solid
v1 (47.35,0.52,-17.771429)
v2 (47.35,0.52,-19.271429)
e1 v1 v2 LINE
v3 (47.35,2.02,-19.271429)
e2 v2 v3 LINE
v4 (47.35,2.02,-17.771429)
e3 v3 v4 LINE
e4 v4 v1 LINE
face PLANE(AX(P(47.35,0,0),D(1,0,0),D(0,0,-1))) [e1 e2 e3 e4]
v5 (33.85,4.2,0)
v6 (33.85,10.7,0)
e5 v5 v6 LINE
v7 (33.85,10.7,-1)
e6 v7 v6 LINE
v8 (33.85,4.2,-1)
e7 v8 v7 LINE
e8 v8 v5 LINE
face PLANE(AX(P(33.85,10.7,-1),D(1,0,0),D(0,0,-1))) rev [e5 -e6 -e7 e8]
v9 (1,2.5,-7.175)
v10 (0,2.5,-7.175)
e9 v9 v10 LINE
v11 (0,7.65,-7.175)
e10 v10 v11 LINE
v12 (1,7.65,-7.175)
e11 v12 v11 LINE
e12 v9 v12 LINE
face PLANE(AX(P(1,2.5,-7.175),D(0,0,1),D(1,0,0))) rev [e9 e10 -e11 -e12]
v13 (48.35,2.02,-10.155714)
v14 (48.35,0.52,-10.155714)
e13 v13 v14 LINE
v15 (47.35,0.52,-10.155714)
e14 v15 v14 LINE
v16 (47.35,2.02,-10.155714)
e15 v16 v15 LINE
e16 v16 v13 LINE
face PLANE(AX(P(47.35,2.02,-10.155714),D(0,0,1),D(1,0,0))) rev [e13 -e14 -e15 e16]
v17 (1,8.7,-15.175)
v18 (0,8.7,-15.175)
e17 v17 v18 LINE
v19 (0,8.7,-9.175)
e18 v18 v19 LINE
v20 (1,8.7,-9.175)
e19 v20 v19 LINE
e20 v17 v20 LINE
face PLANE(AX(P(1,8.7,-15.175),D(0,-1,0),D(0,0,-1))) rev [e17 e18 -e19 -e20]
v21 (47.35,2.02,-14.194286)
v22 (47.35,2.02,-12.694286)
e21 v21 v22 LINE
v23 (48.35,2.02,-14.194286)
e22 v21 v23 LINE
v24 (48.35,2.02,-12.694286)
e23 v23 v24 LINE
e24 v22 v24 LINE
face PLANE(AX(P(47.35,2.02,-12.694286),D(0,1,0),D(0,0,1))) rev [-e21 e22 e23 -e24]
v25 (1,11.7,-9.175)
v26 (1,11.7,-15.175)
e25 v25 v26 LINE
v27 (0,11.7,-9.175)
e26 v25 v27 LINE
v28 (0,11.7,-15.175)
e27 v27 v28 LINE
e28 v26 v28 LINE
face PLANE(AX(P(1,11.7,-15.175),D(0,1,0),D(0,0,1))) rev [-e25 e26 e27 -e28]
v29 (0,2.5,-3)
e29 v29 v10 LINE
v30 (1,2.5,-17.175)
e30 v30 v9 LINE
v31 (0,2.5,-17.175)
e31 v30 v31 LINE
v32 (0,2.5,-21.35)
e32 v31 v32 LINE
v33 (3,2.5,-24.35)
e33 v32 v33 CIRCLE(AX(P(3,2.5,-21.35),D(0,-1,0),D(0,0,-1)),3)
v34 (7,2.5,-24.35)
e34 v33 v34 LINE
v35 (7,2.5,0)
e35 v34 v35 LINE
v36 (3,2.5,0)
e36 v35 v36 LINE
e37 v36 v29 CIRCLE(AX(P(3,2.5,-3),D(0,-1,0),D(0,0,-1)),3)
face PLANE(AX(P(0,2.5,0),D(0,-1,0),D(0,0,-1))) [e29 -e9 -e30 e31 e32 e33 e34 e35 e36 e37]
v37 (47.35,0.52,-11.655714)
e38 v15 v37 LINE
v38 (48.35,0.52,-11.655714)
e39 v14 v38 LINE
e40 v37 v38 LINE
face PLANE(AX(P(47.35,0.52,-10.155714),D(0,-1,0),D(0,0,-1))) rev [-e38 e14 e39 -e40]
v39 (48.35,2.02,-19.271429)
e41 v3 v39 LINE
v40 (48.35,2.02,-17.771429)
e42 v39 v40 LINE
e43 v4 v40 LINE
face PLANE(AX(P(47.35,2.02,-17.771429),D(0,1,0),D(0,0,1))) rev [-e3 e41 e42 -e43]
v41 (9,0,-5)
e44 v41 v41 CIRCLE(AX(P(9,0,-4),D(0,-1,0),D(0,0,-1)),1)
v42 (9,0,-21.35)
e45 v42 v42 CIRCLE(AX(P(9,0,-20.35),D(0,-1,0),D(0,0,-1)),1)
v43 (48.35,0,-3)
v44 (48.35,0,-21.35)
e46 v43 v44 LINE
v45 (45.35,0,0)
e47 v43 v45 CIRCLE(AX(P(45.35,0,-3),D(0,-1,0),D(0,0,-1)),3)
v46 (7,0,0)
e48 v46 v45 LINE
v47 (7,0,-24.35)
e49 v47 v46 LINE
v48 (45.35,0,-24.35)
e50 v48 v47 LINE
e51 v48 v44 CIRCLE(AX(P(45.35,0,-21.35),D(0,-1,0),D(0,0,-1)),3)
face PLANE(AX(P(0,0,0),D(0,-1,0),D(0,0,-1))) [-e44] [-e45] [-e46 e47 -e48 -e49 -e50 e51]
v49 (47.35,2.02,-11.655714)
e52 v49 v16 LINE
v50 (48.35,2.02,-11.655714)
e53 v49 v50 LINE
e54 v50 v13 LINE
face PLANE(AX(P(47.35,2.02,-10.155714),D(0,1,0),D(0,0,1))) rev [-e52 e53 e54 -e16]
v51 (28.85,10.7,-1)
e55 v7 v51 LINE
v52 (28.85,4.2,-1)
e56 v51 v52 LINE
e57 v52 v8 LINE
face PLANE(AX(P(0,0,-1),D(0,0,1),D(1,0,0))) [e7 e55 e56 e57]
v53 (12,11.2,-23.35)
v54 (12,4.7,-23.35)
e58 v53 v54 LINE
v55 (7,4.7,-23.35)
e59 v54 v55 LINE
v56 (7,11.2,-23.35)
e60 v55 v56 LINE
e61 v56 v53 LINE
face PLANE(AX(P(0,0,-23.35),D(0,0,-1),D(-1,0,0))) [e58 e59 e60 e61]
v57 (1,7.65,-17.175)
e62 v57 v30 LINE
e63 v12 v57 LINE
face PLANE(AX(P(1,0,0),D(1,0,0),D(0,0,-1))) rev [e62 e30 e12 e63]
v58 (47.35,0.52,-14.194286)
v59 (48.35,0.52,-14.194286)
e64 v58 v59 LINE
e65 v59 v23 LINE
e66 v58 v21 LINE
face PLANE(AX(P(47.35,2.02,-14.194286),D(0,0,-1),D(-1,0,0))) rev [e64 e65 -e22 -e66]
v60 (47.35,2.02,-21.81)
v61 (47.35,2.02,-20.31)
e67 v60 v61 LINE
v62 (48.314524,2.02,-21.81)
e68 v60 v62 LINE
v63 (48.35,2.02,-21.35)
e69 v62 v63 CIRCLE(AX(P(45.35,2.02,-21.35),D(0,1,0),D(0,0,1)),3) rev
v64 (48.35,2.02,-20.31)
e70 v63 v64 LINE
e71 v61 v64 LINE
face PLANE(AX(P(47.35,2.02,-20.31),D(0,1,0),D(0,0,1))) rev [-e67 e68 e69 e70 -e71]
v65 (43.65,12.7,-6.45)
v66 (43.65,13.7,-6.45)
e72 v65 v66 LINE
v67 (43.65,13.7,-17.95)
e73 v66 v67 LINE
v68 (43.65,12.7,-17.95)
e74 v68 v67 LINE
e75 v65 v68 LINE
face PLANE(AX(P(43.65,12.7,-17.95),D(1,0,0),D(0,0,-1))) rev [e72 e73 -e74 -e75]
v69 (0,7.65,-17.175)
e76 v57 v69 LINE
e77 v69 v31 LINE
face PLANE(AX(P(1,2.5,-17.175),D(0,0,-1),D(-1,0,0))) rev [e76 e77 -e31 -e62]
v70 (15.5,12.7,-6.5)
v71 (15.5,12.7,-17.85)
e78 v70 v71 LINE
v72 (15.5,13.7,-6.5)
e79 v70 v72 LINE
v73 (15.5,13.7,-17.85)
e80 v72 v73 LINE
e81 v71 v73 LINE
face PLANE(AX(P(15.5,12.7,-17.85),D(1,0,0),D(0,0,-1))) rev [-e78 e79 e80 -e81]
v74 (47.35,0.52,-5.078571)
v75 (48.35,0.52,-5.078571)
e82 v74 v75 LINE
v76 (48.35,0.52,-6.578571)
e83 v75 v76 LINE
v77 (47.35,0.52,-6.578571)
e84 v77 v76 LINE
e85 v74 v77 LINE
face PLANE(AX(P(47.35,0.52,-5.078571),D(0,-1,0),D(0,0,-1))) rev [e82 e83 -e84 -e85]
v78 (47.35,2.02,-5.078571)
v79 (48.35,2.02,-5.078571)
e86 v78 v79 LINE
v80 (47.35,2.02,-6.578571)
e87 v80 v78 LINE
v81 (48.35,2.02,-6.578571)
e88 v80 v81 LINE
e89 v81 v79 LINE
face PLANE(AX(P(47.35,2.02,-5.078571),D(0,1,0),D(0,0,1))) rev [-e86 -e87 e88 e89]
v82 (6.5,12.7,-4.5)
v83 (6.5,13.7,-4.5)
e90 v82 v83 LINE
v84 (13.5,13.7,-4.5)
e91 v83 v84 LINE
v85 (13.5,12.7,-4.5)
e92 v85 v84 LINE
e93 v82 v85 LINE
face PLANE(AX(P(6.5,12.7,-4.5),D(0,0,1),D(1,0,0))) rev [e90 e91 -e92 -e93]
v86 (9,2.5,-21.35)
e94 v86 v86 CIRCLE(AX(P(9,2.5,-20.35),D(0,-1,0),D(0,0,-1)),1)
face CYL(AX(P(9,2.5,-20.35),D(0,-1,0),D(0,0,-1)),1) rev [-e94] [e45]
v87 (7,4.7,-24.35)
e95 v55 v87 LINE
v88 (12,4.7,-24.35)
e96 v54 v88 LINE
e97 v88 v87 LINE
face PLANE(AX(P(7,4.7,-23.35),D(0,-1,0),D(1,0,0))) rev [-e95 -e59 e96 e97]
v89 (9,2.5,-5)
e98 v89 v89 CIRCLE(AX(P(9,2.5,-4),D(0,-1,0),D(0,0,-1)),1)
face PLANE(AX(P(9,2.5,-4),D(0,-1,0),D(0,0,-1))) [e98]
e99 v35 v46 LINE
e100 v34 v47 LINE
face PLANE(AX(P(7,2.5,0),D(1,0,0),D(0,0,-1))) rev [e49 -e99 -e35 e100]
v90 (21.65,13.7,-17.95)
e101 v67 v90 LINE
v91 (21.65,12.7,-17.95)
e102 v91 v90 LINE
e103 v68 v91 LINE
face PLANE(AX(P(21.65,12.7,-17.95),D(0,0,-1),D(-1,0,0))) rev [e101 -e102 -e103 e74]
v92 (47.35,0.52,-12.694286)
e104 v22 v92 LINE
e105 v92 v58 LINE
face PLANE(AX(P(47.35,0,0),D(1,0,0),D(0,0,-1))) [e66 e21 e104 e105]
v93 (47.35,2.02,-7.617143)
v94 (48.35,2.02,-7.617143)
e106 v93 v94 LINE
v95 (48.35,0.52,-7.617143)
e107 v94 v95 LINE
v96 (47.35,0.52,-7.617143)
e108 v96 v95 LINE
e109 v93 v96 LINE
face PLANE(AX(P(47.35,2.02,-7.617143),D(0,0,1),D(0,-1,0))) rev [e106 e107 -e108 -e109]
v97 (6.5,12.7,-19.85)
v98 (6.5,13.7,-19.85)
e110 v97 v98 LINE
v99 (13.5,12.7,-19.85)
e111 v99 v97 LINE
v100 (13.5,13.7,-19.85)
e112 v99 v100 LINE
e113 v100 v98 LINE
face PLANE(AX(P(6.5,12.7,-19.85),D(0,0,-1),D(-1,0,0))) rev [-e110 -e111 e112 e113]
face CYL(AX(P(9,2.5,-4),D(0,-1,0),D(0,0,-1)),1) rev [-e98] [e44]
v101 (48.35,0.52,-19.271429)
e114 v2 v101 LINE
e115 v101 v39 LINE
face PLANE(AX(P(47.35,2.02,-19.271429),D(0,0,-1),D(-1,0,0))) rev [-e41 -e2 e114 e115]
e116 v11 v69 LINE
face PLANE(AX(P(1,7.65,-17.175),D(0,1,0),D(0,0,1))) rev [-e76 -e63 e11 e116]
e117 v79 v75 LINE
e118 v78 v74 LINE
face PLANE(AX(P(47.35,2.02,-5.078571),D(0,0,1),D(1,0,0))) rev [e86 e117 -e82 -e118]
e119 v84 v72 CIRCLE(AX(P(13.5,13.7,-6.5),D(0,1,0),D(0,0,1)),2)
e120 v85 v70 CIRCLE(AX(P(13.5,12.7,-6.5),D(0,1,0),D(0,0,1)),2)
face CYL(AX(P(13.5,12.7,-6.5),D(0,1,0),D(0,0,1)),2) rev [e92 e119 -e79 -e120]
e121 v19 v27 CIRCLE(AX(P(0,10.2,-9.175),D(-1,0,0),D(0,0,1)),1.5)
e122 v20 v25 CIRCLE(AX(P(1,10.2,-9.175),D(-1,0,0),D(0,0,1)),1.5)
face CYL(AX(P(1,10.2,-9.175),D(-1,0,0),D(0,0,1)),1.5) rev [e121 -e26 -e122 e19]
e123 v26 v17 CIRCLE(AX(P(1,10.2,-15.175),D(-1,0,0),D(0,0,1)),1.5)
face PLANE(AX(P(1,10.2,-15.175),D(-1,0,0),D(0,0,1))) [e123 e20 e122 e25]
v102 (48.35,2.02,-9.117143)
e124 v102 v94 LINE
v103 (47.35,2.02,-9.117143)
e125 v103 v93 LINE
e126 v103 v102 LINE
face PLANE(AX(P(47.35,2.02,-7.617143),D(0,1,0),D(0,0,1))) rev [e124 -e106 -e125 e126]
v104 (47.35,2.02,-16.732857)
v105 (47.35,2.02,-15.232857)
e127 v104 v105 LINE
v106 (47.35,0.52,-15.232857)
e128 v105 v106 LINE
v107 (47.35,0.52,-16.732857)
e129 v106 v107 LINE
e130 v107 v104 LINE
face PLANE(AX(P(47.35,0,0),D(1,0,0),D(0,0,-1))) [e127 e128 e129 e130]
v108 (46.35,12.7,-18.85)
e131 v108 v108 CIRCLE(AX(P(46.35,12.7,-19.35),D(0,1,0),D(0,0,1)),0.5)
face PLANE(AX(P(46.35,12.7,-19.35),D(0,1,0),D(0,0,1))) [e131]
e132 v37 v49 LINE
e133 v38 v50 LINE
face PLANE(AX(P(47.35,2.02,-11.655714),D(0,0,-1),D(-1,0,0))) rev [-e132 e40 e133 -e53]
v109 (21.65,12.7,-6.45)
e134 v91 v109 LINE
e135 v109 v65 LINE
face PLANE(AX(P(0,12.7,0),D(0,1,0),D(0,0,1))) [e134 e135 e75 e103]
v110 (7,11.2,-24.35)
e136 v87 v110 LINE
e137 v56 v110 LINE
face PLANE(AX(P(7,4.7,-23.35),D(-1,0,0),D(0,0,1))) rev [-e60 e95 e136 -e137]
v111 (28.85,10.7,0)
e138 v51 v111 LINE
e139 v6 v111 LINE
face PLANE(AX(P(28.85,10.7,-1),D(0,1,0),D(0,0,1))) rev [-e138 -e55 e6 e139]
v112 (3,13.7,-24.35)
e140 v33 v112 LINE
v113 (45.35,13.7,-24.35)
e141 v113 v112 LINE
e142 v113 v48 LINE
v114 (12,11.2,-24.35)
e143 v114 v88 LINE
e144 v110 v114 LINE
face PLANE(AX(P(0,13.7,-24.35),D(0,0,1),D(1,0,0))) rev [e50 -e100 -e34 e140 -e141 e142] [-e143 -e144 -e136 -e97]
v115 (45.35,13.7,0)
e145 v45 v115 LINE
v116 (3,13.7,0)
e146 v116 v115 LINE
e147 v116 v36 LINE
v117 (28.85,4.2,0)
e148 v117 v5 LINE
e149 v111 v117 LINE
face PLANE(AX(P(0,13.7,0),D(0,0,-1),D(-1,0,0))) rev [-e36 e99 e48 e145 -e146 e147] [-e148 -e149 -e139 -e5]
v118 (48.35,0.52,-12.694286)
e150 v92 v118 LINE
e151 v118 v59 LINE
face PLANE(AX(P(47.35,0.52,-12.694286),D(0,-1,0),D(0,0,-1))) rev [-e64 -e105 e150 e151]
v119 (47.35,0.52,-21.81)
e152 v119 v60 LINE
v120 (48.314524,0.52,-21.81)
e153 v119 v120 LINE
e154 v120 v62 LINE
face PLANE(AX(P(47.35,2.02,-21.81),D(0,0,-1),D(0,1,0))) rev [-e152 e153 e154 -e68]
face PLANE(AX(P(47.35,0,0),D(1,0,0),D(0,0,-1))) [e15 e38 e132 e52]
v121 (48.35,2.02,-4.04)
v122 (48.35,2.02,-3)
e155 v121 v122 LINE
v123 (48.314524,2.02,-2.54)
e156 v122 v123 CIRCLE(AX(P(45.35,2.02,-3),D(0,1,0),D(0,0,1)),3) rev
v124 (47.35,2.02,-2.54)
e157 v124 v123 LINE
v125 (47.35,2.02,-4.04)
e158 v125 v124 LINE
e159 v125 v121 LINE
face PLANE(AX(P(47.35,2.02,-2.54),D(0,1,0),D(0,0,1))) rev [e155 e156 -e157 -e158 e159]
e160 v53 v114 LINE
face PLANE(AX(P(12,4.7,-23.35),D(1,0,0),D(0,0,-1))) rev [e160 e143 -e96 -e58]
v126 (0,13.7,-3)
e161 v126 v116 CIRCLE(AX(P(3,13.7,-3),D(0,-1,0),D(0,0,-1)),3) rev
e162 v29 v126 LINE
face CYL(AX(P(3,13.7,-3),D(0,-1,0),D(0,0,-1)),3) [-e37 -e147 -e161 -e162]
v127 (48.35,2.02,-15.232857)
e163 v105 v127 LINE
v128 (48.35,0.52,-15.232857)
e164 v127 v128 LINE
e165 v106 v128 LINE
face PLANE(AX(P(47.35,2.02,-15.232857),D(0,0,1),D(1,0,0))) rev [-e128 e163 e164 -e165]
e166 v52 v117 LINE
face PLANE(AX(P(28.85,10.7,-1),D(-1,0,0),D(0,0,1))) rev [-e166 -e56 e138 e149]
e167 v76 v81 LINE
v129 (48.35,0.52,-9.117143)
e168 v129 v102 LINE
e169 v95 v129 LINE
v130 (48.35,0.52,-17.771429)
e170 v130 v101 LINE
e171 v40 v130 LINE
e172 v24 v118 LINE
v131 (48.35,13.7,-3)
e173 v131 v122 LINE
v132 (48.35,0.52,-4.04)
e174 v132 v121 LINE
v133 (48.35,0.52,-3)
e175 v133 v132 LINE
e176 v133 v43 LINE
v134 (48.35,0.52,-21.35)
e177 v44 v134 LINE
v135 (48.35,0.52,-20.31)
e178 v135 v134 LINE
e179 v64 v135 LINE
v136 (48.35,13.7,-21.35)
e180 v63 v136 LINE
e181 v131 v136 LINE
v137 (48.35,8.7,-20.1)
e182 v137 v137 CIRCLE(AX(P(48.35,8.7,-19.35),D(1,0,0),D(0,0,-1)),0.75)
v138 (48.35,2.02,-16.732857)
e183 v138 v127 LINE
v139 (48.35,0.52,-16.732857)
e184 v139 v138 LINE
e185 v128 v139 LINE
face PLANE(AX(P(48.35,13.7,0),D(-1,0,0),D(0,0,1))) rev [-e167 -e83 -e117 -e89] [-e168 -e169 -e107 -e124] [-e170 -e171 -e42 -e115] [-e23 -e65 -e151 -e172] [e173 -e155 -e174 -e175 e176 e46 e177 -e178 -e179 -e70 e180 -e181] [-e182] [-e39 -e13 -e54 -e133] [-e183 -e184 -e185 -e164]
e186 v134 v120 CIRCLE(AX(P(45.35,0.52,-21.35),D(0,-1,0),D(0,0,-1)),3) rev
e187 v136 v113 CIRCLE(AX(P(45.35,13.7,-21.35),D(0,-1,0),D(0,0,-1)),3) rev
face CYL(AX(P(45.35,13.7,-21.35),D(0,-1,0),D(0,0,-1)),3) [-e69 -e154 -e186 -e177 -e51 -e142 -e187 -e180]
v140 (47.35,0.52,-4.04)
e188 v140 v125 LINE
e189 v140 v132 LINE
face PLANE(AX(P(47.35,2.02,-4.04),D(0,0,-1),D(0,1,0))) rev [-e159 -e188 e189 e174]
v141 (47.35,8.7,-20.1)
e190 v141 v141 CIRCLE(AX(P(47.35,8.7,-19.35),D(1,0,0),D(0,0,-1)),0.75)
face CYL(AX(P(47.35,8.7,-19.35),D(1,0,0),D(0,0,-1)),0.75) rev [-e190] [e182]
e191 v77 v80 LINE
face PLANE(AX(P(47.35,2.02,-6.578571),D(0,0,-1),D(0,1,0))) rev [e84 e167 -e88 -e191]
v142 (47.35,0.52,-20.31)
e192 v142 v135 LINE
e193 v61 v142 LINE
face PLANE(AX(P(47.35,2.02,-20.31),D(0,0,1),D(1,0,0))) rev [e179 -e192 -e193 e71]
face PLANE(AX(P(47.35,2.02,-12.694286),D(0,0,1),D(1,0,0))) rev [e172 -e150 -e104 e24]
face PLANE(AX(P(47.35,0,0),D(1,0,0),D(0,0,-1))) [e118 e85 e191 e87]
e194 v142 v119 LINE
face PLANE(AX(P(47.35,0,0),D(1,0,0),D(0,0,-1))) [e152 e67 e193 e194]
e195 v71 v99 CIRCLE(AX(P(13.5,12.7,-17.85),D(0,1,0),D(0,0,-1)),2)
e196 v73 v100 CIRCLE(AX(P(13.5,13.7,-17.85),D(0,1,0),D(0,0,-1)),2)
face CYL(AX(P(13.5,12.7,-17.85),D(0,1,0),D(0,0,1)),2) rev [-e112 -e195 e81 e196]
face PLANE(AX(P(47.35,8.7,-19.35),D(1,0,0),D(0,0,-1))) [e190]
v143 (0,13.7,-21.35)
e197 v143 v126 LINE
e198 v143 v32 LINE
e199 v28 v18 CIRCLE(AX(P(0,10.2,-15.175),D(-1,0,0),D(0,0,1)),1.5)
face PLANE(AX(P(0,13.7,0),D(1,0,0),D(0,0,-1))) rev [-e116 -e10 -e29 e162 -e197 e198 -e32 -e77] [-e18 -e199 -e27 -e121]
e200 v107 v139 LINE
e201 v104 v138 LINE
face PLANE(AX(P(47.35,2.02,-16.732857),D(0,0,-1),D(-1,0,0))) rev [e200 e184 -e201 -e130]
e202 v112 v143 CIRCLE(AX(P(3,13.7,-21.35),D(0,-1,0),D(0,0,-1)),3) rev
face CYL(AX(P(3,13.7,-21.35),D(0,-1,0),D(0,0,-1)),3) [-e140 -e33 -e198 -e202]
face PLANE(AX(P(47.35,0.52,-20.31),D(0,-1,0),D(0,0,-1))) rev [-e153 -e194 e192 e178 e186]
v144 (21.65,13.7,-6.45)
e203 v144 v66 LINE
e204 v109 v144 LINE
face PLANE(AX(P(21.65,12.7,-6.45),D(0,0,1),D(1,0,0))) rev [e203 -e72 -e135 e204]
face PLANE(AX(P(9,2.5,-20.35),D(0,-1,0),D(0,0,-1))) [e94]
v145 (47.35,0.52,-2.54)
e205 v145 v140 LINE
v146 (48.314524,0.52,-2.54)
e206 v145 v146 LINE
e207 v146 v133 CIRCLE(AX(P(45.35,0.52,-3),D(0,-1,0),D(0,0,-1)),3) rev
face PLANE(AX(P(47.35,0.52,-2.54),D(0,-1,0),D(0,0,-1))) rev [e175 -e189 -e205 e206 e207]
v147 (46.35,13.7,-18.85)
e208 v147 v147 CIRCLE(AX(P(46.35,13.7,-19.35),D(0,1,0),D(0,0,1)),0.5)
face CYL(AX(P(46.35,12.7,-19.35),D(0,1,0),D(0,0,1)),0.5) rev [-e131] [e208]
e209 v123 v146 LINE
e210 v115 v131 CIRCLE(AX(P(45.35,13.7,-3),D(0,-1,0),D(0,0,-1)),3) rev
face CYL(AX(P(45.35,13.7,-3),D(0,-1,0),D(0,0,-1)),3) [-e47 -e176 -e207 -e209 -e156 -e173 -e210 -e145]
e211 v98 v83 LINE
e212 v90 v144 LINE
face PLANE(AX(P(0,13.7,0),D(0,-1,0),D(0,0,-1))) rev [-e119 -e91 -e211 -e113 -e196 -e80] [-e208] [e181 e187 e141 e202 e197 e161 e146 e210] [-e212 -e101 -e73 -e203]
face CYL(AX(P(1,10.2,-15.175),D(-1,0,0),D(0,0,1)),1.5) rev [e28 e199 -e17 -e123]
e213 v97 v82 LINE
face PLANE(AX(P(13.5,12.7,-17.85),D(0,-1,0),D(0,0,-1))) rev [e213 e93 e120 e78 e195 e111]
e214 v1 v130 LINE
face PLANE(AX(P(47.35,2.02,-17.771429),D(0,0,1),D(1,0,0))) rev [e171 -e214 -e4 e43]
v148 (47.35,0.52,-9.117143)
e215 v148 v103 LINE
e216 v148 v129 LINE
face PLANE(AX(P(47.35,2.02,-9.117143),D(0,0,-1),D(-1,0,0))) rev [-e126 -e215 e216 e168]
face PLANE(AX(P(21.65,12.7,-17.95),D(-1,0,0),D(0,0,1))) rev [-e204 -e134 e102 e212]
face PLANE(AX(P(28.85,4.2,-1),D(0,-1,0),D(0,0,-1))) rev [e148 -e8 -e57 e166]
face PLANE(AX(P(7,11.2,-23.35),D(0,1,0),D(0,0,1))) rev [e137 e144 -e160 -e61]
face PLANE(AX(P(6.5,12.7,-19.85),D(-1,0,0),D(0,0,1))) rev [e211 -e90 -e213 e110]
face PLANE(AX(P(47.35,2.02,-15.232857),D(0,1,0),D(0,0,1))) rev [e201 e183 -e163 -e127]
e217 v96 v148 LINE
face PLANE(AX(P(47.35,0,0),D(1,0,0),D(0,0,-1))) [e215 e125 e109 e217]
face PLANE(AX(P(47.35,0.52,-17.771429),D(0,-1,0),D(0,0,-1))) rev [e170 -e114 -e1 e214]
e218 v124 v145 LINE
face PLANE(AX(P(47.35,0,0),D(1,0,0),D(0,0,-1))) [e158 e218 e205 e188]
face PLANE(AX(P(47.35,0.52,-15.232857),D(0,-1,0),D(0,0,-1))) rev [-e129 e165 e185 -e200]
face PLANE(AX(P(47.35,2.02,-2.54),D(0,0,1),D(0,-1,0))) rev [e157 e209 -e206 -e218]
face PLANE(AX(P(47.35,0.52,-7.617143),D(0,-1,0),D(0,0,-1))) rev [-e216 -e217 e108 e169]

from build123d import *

# Parameters (mm, degrees)
SKETCH1_W           = 48.35
SKETCH1_H           = 24.35
BOSS_EXTRUDE1_DEPTH = 13.7
SKETCH2_R           = 0.5
SKETCH2_W           = 22
SKETCH2_H           = 11.5
CUT_EXTRUDE1_DEPTH  = 1
SKETCH3_W           = 5
SKETCH3_H           = 6.5
CUT_EXTRUDE2_DEPTH  = 1
SKETCH4_R           = 0.75
SKETCH4_W           = 1.5
SKETCH4_H           = 1.5
CUT_EXTRUDE3_DEPTH  = 1
SKETCH5_W           = 5
SKETCH5_H           = 6.5
CUT_EXTRUDE4_DEPTH  = 1
SKETCH6_R           = 1
SKETCH6_W           = 7
SKETCH6_H           = 24.35
CUT_EXTRUDE5_DEPTH  = 2.5
SKETCH7_W           = 10
SKETCH7_H           = 5.15
CUT_EXTRUDE6_DEPTH  = 1
FILLET1_R           = 3


with BuildPart() as part:
    # Sketch1 → Boss-Extrude1 (new body)
    with BuildSketch(Plane(origin=(0, 0, 0), x_dir=(1, 0, 0), z_dir=(0, 1, 0))):
        with Locations((24.175, 12.175)):
            Rectangle(SKETCH1_W, SKETCH1_H)
    extrude(amount=BOSS_EXTRUDE1_DEPTH)

    # Sketch2 → Cut-Extrude1 (cut)
    with BuildSketch(Plane(origin=(0, 13.7, 0), x_dir=(1, 0, 0), z_dir=(0, 1, 0))):
        with Locations(Location((46.35, 19.35, 0), (0, 0, 270))):
            Circle(SKETCH2_R)
        with BuildLine():
            Line((6.5, 19.85), (6.5, 4.5))
            Line((6.5, 4.5), (13.5, 4.5))
            ThreePointArc((13.5, 4.5), (14.914213562, 5.085786438), (15.5, 6.5))
            Line((15.5, 6.5), (15.5, 17.85))
            ThreePointArc((15.5, 17.85), (14.914213562, 19.264213562), (13.5, 19.85))
            Line((13.5, 19.85), (6.5, 19.85))
        make_face()
        with Locations((32.65, 12.2)):
            Rectangle(SKETCH2_W, SKETCH2_H)
    extrude(amount=-CUT_EXTRUDE1_DEPTH, mode=Mode.SUBTRACT)

    # Sketch3 → Cut-Extrude2 (cut)
    with BuildSketch(Plane(origin=(0, 0, -24.35), x_dir=(-1, 0, 0), z_dir=(0, 0, -1))):
        with Locations((-9.5, 7.95)):
            Rectangle(SKETCH3_W, SKETCH3_H)
    extrude(amount=-CUT_EXTRUDE2_DEPTH, mode=Mode.SUBTRACT)

    # Sketch4 → Cut-Extrude3 (cut)
    with BuildSketch(Plane(origin=(48.35, 0, 0), x_dir=(0, 0, -1), z_dir=(1, 0, 0))):
        with Locations((19.35, 8.7)):
            Circle(SKETCH4_R)
        with Locations((5.828571429, 1.27)):
            Rectangle(SKETCH4_W, SKETCH4_H)
        with Locations((3.29, 1.27)):
            Rectangle(SKETCH4_W, SKETCH4_H)
        with Locations((8.367142857, 1.27)):
            Rectangle(SKETCH4_W, SKETCH4_H)
        with Locations((10.905714286, 1.27)):
            Rectangle(SKETCH4_W, SKETCH4_H)
        with Locations((13.444285714, 1.27)):
            Rectangle(SKETCH4_W, SKETCH4_H)
        with Locations((15.982857143, 1.27)):
            Rectangle(SKETCH4_W, SKETCH4_H)
        with Locations((18.521428571, 1.27)):
            Rectangle(SKETCH4_W, SKETCH4_H)
        with Locations((21.06, 1.27)):
            Rectangle(SKETCH4_W, SKETCH4_H)
    extrude(amount=-CUT_EXTRUDE3_DEPTH, mode=Mode.SUBTRACT)

    # Sketch5 → Cut-Extrude4 (cut)
    with BuildSketch(Plane.XY):
        with Locations((31.35, 7.45)):
            Rectangle(SKETCH5_W, SKETCH5_H)
    extrude(amount=-CUT_EXTRUDE4_DEPTH, mode=Mode.SUBTRACT)

    # Sketch6 → Cut-Extrude5 (cut)
    with BuildSketch(Plane.XZ):
        with Locations(Location((9, -4, 0), (0, 0, 270))):
            Circle(SKETCH6_R)
        with Locations(Location((9, -20.35, 0), (0, 0, 270))):
            Circle(SKETCH6_R)
        with Locations((3.5, -12.175)):
            Rectangle(SKETCH6_W, SKETCH6_H)
    extrude(amount=-CUT_EXTRUDE5_DEPTH, mode=Mode.SUBTRACT)

    # Sketch7 → Cut-Extrude6 (cut)
    with BuildSketch(Plane.ZY):
        with BuildLine():
            Line((-15.175, 11.7), (-9.175, 11.7))
            ThreePointArc((-9.175, 11.7), (-7.675, 10.2), (-9.175, 8.7))
            Line((-9.175, 8.7), (-15.175, 8.7))
            ThreePointArc((-15.175, 8.7), (-16.675, 10.2), (-15.175, 11.7))
        make_face()
        with Locations((-12.175, 5.075)):
            Rectangle(SKETCH7_W, SKETCH7_H)
    extrude(amount=-CUT_EXTRUDE6_DEPTH, mode=Mode.SUBTRACT)

    # Fillet1
    # the kernel refuses this fillet: 3 mm, written as the material it takes off along each edge
    with BuildSketch(Plane(origin=(0, -5, -24.35), x_dir=(0, 0, 1), z_dir=(0, 1, 0)), Plane(origin=(0, -5, 0), x_dir=(1, 0, 0), z_dir=(0, 1, 0))) as fillet1_piece_1:
        with BuildLine():
            CenterArc((FILLET1_R, FILLET1_R), FILLET1_R, 180, 90)
            Line((0, FILLET1_R), (0, 0))
            Line((0, 0), (FILLET1_R, 0))
        make_face()
    extrude(amount=26.2, mode=Mode.SUBTRACT)
    with BuildSketch(Plane(origin=(48.35, -7.5, -24.35), x_dir=(0, 0, 1), z_dir=(0, 1, 0)), Plane(origin=(48.35, -7.5, 0), x_dir=(-1, 0, 0), z_dir=(0, 1, 0))) as fillet1_piece_2:
        with BuildLine():
            CenterArc((FILLET1_R, -FILLET1_R), FILLET1_R, 90, 90)
            Line((0, -FILLET1_R), (0, 0))
            Line((0, 0), (FILLET1_R, 0))
        make_face()
    extrude(amount=28.7, mode=Mode.SUBTRACT)


solid = part.part
